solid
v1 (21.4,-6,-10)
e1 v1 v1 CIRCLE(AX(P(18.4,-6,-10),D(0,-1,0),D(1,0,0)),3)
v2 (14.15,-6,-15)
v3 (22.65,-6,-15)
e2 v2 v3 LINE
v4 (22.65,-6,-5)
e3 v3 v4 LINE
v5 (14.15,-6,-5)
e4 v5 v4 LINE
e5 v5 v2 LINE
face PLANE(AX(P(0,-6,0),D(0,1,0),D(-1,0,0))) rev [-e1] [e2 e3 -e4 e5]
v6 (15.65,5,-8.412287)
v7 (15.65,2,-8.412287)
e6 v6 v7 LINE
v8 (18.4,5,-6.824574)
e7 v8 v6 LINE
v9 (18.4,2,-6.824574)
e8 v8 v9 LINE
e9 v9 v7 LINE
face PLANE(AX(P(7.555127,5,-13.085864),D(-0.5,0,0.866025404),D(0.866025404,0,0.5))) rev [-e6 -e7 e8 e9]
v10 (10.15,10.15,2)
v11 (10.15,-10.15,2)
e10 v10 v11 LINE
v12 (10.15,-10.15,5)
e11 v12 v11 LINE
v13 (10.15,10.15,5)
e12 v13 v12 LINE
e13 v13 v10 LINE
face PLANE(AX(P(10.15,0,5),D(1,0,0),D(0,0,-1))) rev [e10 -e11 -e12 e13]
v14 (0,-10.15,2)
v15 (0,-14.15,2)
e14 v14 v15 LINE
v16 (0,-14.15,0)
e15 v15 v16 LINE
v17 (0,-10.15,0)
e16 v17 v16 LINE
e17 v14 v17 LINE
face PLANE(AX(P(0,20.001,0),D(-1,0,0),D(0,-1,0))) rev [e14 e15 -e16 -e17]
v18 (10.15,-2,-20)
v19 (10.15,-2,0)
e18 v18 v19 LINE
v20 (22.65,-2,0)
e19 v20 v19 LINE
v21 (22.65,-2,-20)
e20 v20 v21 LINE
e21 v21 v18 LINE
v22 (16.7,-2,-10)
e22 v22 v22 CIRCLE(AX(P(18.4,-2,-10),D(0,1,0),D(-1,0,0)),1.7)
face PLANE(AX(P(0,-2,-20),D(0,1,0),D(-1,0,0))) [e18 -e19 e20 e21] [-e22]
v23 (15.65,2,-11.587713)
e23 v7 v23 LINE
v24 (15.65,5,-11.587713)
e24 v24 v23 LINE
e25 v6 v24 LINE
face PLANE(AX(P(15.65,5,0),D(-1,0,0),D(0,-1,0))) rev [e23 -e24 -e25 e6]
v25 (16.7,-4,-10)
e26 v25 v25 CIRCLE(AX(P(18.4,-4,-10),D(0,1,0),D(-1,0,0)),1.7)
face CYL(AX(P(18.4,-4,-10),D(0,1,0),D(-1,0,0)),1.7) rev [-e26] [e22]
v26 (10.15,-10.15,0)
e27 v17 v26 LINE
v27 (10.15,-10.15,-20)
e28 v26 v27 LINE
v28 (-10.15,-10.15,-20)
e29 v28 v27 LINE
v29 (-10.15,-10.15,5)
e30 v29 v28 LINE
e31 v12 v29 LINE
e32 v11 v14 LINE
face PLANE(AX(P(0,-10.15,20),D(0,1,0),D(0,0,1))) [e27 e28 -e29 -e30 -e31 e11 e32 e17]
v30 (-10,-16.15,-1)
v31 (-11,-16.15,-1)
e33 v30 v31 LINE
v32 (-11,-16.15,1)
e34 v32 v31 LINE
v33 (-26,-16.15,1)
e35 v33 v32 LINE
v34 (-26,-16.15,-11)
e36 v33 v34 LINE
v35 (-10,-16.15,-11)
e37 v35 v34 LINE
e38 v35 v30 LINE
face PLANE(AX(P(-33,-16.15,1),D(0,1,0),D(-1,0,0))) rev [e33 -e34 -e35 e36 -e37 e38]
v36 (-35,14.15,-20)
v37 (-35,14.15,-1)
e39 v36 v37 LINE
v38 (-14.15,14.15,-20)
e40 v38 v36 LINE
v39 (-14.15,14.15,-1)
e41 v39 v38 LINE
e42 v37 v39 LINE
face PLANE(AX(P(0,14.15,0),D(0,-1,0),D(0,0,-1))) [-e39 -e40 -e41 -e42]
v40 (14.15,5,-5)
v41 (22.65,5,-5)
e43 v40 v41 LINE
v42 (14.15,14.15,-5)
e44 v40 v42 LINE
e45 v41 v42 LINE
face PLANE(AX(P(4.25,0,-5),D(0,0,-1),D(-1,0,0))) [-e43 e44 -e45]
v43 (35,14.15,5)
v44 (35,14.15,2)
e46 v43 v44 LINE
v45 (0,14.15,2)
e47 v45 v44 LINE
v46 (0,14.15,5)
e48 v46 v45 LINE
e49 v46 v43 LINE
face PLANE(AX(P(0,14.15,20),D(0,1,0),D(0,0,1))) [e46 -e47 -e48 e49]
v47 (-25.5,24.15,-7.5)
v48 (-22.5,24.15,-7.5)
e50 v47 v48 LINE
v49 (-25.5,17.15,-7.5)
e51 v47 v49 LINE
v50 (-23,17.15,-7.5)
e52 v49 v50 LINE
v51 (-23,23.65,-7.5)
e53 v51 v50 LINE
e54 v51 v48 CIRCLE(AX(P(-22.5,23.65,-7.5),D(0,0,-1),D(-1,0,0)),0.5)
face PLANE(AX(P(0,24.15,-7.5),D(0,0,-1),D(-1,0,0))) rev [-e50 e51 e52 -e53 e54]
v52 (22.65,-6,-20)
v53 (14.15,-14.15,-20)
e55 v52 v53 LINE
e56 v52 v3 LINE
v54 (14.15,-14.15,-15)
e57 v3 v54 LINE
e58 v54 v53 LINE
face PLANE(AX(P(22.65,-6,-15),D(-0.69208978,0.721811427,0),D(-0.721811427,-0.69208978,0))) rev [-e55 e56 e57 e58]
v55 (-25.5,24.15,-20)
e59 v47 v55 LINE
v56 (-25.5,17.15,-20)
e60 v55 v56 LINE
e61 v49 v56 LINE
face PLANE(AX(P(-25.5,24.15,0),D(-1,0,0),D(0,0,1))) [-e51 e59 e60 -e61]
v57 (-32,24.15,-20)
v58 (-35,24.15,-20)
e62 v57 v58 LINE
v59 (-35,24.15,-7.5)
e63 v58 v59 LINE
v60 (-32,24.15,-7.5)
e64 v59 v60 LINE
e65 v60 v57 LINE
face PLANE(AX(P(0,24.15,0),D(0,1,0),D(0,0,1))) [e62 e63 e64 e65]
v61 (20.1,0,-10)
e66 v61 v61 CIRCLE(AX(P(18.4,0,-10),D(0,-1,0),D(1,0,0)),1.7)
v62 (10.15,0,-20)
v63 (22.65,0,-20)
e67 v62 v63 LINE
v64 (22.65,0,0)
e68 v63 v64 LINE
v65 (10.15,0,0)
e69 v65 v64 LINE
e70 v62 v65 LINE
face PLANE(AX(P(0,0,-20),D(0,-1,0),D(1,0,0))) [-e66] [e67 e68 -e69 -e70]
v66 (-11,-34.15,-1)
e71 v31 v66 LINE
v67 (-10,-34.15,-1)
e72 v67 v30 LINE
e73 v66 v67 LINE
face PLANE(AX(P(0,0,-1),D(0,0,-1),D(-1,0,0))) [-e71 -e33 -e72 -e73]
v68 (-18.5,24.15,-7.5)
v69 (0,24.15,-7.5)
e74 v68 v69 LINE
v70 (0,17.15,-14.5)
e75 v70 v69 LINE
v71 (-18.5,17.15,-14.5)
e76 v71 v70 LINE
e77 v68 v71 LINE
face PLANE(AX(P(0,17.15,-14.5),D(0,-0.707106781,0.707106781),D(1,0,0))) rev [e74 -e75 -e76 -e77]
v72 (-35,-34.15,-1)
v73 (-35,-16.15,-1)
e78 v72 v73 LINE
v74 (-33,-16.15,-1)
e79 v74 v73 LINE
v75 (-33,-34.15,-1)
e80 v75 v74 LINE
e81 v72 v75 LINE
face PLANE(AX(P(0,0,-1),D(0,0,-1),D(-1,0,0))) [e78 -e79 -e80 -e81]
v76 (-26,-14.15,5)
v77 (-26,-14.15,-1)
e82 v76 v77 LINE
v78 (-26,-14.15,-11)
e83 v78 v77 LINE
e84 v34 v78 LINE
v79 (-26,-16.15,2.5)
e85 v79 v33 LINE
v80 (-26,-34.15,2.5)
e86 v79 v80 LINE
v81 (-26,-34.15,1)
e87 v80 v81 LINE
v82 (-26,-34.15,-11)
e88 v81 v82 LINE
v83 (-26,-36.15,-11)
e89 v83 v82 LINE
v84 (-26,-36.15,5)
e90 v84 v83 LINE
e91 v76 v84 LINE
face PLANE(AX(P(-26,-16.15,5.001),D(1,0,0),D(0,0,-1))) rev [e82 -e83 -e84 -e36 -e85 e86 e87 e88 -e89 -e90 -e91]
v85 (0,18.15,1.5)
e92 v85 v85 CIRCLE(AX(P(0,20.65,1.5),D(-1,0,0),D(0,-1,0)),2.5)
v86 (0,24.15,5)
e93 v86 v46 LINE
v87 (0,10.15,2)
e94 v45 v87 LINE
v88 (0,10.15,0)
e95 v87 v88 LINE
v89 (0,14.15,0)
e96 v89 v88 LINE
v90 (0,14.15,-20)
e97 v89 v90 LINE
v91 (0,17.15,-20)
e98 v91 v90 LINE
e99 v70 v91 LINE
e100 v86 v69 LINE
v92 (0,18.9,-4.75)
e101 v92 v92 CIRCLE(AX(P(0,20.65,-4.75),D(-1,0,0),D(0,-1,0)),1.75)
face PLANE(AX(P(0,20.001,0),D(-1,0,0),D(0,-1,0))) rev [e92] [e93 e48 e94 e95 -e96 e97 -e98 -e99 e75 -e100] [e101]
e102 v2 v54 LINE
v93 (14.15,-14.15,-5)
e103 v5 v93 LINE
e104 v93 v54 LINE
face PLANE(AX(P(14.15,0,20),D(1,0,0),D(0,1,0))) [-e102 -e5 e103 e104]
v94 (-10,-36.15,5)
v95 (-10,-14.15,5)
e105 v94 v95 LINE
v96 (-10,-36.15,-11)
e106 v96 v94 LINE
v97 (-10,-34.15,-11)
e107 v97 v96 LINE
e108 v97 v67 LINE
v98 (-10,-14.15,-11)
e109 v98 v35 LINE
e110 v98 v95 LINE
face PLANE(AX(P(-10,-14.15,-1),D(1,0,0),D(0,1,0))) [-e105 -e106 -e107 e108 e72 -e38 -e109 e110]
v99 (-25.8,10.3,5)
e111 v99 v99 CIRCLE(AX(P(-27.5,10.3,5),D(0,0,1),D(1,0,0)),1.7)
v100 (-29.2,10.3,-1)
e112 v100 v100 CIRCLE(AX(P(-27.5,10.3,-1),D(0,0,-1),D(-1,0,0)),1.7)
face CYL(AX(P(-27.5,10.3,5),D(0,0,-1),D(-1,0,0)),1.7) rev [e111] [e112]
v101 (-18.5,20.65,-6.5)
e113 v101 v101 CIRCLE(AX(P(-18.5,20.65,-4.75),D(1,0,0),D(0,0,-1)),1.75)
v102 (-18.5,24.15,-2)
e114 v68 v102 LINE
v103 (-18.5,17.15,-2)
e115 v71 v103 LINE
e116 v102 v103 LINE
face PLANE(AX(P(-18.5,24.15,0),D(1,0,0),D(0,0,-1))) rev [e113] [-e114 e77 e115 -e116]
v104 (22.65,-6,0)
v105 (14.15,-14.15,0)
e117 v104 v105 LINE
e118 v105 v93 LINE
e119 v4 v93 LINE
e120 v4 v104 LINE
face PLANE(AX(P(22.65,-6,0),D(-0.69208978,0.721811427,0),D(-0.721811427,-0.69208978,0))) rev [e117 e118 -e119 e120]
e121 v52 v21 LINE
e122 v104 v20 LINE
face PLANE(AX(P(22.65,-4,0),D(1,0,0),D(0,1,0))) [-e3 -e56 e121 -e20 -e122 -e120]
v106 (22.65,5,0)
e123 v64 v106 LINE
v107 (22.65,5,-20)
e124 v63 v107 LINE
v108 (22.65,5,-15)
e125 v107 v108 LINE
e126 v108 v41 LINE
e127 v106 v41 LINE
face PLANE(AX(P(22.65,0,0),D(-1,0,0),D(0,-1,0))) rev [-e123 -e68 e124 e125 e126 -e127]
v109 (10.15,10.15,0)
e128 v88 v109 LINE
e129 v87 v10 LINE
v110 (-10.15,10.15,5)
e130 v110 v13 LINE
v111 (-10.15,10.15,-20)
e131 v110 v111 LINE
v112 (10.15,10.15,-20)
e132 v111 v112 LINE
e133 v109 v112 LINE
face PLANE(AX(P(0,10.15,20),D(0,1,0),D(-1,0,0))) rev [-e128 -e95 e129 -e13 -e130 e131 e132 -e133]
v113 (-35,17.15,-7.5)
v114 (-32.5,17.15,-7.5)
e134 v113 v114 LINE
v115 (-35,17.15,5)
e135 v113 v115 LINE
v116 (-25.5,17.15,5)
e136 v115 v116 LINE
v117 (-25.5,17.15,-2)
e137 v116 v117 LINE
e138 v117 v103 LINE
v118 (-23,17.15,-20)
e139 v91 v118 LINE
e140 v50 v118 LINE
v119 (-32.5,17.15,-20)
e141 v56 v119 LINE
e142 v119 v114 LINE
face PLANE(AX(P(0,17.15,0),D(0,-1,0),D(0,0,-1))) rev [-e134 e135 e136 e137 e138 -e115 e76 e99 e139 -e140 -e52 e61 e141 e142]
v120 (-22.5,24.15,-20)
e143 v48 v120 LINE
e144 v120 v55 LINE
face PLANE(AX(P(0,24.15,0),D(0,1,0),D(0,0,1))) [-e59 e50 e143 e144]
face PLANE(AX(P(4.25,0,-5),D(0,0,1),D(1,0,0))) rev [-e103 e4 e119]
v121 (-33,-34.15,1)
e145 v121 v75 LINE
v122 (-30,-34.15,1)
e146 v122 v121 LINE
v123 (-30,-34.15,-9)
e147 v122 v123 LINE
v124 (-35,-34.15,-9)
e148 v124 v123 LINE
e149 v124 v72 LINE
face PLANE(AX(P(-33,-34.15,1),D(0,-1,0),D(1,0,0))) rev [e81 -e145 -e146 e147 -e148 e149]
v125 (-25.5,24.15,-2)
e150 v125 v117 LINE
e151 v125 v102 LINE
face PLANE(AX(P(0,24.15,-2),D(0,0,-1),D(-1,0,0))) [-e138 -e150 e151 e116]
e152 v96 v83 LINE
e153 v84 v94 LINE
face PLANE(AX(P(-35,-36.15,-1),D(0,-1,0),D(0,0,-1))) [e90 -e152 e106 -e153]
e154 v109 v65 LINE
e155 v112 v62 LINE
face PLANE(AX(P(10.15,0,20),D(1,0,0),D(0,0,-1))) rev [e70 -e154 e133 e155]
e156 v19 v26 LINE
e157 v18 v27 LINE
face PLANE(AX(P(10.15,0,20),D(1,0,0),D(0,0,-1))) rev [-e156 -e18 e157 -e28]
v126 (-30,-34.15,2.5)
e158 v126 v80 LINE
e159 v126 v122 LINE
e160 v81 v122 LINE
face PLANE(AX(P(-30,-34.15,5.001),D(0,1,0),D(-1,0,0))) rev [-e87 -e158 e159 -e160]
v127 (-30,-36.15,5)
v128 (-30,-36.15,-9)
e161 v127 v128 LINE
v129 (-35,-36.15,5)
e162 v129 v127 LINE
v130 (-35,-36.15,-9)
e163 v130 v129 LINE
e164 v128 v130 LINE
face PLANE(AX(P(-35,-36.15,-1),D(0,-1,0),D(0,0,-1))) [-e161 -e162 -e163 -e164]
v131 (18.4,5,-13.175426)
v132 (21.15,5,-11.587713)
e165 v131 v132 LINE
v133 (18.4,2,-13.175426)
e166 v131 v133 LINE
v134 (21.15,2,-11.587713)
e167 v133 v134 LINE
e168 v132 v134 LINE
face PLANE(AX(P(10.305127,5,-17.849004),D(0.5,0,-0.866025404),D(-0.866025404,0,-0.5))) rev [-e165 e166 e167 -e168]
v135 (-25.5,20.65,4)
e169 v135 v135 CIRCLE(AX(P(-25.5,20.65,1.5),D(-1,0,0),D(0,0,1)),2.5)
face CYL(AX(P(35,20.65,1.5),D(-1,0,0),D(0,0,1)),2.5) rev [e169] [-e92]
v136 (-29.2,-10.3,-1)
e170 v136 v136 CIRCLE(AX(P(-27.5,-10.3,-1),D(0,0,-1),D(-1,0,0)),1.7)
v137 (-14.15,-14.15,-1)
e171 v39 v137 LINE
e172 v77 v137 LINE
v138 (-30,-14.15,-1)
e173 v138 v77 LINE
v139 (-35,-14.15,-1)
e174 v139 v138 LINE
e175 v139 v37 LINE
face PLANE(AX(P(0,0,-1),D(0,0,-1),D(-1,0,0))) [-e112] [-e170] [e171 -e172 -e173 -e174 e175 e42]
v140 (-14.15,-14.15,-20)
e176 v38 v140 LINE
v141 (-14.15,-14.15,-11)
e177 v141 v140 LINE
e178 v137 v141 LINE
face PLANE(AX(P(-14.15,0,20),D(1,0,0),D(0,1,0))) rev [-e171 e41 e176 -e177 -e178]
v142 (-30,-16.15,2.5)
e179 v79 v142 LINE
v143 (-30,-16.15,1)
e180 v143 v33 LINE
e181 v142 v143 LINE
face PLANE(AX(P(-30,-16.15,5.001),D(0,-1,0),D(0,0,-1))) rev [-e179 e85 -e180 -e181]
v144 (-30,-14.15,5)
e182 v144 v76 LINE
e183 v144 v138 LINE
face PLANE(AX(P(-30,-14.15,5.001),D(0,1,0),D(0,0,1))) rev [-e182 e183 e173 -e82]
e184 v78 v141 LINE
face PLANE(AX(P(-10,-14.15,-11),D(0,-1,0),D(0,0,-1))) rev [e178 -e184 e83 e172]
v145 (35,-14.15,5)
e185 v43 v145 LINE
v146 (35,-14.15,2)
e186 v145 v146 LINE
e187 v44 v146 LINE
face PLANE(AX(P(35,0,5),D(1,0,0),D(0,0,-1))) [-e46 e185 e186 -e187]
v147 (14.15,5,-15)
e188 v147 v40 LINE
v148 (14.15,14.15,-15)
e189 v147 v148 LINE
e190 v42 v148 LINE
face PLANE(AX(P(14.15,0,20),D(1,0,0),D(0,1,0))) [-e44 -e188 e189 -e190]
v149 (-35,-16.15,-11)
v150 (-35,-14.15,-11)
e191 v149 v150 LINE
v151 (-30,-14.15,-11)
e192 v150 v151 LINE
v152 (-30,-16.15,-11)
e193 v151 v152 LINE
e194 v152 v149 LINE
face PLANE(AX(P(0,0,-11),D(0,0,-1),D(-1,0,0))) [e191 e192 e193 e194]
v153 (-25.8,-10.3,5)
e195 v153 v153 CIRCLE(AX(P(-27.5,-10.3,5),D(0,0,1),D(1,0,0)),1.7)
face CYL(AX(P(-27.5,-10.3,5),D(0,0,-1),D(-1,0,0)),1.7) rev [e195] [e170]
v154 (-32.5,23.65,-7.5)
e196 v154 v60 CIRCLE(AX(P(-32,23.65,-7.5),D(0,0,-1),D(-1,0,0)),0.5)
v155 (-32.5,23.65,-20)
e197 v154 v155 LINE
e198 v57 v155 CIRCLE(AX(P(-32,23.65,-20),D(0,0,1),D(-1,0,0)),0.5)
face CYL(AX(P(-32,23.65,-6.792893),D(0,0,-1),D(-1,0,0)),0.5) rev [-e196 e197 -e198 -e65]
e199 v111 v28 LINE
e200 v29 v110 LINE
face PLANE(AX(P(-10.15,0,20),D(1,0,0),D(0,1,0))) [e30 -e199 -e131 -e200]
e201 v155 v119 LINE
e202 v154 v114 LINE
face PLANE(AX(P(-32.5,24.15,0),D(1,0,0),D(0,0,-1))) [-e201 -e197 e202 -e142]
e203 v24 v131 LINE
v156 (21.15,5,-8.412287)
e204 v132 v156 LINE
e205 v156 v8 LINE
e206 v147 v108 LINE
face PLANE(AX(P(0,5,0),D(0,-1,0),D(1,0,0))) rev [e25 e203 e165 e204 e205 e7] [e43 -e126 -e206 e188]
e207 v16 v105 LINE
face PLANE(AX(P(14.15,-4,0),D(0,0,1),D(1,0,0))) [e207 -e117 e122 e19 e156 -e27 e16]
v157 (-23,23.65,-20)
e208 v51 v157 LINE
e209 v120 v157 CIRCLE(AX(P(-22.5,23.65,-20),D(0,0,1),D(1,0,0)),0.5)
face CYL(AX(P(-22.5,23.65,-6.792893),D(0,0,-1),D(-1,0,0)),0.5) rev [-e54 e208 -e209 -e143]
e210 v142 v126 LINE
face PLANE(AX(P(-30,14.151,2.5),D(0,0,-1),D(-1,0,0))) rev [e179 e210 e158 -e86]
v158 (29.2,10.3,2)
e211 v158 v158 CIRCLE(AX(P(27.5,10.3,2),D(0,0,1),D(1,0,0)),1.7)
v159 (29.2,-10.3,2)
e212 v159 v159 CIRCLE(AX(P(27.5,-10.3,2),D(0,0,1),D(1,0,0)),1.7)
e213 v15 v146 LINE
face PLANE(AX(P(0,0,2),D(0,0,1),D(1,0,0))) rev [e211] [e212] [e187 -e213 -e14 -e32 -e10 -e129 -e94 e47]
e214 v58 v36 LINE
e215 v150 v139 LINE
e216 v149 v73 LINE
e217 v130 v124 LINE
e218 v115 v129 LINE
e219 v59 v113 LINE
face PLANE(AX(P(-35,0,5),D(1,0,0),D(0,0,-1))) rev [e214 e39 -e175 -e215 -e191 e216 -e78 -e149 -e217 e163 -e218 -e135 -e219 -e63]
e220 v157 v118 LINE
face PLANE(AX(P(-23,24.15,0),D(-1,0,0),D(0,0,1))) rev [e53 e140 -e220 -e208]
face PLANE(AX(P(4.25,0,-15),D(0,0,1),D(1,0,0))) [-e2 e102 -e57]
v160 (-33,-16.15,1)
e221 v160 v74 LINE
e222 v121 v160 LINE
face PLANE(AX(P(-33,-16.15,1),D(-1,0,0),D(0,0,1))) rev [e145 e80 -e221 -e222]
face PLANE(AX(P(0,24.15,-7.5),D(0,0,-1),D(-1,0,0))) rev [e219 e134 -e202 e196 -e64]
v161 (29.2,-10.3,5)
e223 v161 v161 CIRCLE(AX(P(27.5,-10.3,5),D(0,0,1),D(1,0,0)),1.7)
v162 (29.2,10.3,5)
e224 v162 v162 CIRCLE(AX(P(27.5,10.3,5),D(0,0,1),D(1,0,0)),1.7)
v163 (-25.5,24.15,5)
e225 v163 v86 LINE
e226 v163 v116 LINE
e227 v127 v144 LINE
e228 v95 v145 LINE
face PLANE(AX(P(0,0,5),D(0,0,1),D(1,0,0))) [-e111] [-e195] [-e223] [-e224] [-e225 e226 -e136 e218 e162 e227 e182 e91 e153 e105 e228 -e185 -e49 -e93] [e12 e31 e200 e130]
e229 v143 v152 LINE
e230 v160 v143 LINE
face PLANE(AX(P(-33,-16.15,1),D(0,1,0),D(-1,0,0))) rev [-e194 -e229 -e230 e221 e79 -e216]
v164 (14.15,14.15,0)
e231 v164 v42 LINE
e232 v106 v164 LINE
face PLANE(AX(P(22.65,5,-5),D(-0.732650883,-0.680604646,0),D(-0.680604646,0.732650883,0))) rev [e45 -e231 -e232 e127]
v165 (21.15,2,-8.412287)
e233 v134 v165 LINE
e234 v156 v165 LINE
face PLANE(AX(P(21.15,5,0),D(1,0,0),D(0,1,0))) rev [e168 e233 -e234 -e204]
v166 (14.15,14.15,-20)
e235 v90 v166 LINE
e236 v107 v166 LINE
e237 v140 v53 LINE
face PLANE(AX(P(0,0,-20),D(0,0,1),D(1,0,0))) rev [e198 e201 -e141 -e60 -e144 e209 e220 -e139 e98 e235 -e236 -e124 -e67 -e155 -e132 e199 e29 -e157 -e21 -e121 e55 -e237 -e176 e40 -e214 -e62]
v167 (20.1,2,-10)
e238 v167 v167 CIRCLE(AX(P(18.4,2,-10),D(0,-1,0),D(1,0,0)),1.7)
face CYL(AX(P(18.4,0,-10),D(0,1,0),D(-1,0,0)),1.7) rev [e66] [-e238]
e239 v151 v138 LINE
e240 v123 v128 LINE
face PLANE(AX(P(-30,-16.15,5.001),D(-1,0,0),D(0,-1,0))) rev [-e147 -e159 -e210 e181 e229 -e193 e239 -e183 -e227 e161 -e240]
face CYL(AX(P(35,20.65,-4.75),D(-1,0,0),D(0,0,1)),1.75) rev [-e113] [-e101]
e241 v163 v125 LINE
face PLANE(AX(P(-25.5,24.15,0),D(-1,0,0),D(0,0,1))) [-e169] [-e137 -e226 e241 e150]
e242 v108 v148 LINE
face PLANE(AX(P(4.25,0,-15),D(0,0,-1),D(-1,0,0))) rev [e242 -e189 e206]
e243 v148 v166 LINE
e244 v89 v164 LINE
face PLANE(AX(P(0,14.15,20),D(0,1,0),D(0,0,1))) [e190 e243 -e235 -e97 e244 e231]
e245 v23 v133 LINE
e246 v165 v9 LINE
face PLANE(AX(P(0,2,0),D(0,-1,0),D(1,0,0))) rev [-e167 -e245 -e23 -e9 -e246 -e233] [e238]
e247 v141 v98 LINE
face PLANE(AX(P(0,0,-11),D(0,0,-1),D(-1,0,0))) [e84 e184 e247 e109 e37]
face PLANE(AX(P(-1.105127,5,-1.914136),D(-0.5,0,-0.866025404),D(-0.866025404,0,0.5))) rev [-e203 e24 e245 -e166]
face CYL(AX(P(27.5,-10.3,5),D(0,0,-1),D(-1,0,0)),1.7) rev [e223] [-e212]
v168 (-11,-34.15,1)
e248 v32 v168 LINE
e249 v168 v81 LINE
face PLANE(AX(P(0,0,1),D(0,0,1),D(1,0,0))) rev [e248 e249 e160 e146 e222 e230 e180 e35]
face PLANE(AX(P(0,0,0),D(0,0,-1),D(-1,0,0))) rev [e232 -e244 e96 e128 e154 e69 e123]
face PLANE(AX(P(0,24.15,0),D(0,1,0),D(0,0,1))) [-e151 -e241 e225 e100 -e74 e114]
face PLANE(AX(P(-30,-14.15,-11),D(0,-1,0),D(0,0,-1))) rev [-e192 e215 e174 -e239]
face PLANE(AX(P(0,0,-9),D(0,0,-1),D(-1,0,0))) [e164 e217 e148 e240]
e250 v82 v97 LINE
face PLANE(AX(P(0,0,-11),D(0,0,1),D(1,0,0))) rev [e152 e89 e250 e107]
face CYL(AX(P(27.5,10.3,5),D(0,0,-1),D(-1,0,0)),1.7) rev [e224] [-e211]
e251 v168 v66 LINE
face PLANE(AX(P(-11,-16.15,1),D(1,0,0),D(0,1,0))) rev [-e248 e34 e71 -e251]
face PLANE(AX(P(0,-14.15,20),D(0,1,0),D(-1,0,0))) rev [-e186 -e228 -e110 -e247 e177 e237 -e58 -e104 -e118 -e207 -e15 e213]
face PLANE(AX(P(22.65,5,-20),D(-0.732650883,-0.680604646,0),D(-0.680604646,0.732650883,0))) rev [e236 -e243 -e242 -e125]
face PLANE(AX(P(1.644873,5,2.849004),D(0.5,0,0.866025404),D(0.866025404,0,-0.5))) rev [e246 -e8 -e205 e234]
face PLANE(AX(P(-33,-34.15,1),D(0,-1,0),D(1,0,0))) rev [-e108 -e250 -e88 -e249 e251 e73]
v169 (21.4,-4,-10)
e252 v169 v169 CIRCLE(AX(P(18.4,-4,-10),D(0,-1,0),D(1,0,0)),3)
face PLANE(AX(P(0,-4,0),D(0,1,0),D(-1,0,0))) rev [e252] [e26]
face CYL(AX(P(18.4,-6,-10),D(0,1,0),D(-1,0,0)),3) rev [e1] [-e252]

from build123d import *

# Parameters (mm, degrees)
ESQUISSE1_W                = 28.3
ESQUISSE1_H                = 28.3
ESQUISSE1_W_2              = 20.3
ESQUISSE1_H_2              = 20.3
BOSS_EXTRU_1_DEPTH         = 20
BOSS_EXTRU_7_DEPTH         = 20
ESQUISSE2_W                = 8.5
ESQUISSE2_H                = 20
ESQUISSE2_R                = 1.7
BOSS_EXTRU_2_DEPTH         = 2
ESQUISSE2_3_W              = 8.5
ESQUISSE2_3_H              = 20
BOSS_EXTRU_3_DEPTH         = 3
ESQUISSE3_W                = 8.5
ESQUISSE3_H                = 20
ESQUISSE3_R                = 1.7
BOSS_EXTRU_4_DEPTH         = 2
ESQUISSE5_W                = 8.5
ESQUISSE5_H                = 20
ESQUISSE5_R                = 3
BOSS_EXTRU_5_DEPTH         = 2
BOSS_EXTRU_6_DEPTH         = 20
BOSS_EXTRU_6_DEPTH_BACK    = 20
ESQUISSE6_W                = 28.3
ESQUISSE6_H                = 28.3
ESQUISSE6_W_2              = 15.3
ESQUISSE6_H_2              = 15.3
ENL_V_MAT_EXTRU_1_REACH    = 68.678
ESQUISSE7_W                = 6.5
ESQUISSE7_H                = 2
ENL_V_MAT_EXTRU_2_REACH    = 65.341
ESQUISSE8_W                = 14.15
ESQUISSE8_H                = 2
ESQUISSE9_W                = 8.5
ESQUISSE9_H                = 40
BOSS_EXTRU_8_DEPTH         = 5
ESQUISSE9_4_R              = 1.7
BOSS_EXTRU_9_DEPTH         = 2
BOSS_EXTRU_10_START        = -2
ESQUISSE10_W               = 8.5
ESQUISSE10_H               = 40
ESQUISSE10_R               = 1.7
BOSS_EXTRU_10_DEPTH        = 2
ESQUISSE11_W               = 8.5
ESQUISSE11_H               = 40
ESQUISSE11_R               = 3
BOSS_EXTRU_11_DEPTH        = 2
NERVURE4_REACH             = 68.678
ESQUISSE14_WALL_W          = 147.131281186
ESQUISSE14_WALL_H          = 5
NERVURE10_REACH            = 68.678
ESQUISSE16_WALL_W          = 147.844247416
ESQUISSE16_WALL_H          = 5
R_P_TITION_LIN_AIRE1_COUNT = 3
R_P_TITION_LIN_AIRE1_PITCH = 17.5
NERVURE11_REACH            = 76.685
ESQUISSE17_WALL_W          = 163.85974229
ESQUISSE17_WALL_H          = 5
NERVURE17_REACH            = 58.973
ESQUISSE19_WALL_W          = 127.721749296
ESQUISSE19_WALL_H          = 5
R_P_TITION_LIN_AIRE2_COUNT = 2
R_P_TITION_LIN_AIRE2_PITCH = 15
R_P_TITION_LIN_AIRE3_COUNT = 2
R_P_TITION_LIN_AIRE3_PITCH = 15
ENL_V_MAT_EXTRU_3_REACH    = 57.288
ESQUISSE20_W               = 77.833771897
ESQUISSE20_H               = 63.25162408
ESQUISSE21_W               = 14.15
ESQUISSE21_H               = 3.85
BOSS_EXTRU_12_DEPTH        = 3
BOSS_EXTRU_13_START        = 3
ESQUISSE23_W               = 20.85
ESQUISSE23_H               = 28.3
ESQUISSE23_R               = 1.7
BOSS_EXTRU_13_DEPTH        = 3
ESQUISSE24_W               = 25
ESQUISSE24_H               = 22
BOSS_EXTRU_14_DEPTH        = 6
ESQUISSE25_W               = 22
ESQUISSE25_H               = 18
ENL_V_MAT_EXTRU_4_DEPTH    = 2
ENL_V_MAT_EXTRU_5_REACH    = 55.785
ESQUISSE26_W               = 4
ESQUISSE26_H               = 2
ENL_V_MAT_EXTRU_6_REACH    = 64.912
ESQUISSE27_W               = 4
ESQUISSE27_H               = 2.5
ESQUISSE28_W               = 16
ESQUISSE28_H               = 2
ESQUISSE28_W_2             = 5
BOSS_EXTRU_15_DEPTH        = 10
ESQUISSE29_W               = 5
ESQUISSE29_H               = 2
ENL_V_MAT_EXTRU_7_DEPTH    = 2
ESQUISSE30_W               = 35
ESQUISSE30_H               = 25
BOSS_EXTRU_16_DEPTH        = 3
ESQUISSE31_W               = 2.5
ESQUISSE31_H               = 12.5
ESQUISSE31_W_2             = 18.5
ESQUISSE31_H_2             = 5.5
BOSS_EXTRU_17_DEPTH        = 7
ESQUISSE32_R               = 1.75
ESQUISSE32_R_2             = 2.5
ENL_V_MAT_EXTRU_8_DEPTH    = 74.260306442
CHANFREIN1_SIZE            = 7
BOSS_EXTRU_18_DEPTH        = 12.5


with BuildPart() as part:
    # Esquisse1 → Boss.-Extru.1 (new body)
    with BuildSketch(Plane.XY):
        Rectangle(ESQUISSE1_W, ESQUISSE1_H)
        Rectangle(ESQUISSE1_W_2, ESQUISSE1_H_2, mode=Mode.SUBTRACT)
    extrude(amount=BOSS_EXTRU_1_DEPTH)

    # Esquisse1<3> → Boss.-Extru.7 (add)
    with BuildSketch(Plane.XY):
        Polygon((14.15, 14.15), (-14.15, 14.15), (-14.15, -14.15), (14.15, -14.15), (14.15, -2), (10.15, -2), (10.15, -10.15), (-10.15, -10.15), (-10.15, 10.15), (10.15, 10.15), (10.15, 0), (14.15, 0), align=None)
    extrude(amount=-BOSS_EXTRU_7_DEPTH)

    # Esquisse2 → Boss.-Extru.2 (add)
    with BuildSketch(Plane(origin=(0, 2, 0), x_dir=(-1, 0, 0), z_dir=(0, -1, 0))):
        with Locations((-18.4, 10)):
            Rectangle(ESQUISSE2_W, ESQUISSE2_H)
        with Locations(Location((-18.4, 10, 0), (0, 0, 180))):
            Circle(ESQUISSE2_R, mode=Mode.SUBTRACT)
    extrude(amount=BOSS_EXTRU_2_DEPTH)

    # Esquisse2<3> → Boss.-Extru.3 (add)
    with BuildSketch(Plane(origin=(0, 2, 0), x_dir=(-1, 0, 0), z_dir=(0, -1, 0))):
        with Locations((-18.4, 10)):
            Rectangle(ESQUISSE2_3_W, ESQUISSE2_3_H)
        Polygon((-15.65, 11.58771324), (-15.65, 8.41228676), (-18.4, 6.824573519), (-21.15, 8.41228676), (-21.15, 11.58771324), (-18.4, 13.175426481), align=None, mode=Mode.SUBTRACT)
    extrude(amount=-BOSS_EXTRU_3_DEPTH)

    # Esquisse3 → Boss.-Extru.4 (add)
    with BuildSketch(Plane(origin=(0, -2, 0), x_dir=(1, 0, 0), z_dir=(0, 1, 0))):
        with Locations((18.4, 10)):
            Rectangle(ESQUISSE3_W, ESQUISSE3_H)
        with Locations((18.4, 10)):
            Circle(ESQUISSE3_R, mode=Mode.SUBTRACT)
    extrude(amount=-BOSS_EXTRU_4_DEPTH)

    # Esquisse5 → Boss.-Extru.5 (add)
    with BuildSketch(Plane.XZ.offset(4)):
        with Locations((18.4, -10)):
            Rectangle(ESQUISSE5_W, ESQUISSE5_H)
        with Locations((18.4, -10)):
            Circle(ESQUISSE5_R, mode=Mode.SUBTRACT)
    extrude(amount=BOSS_EXTRU_5_DEPTH)

    # Esquisse6 → Boss.-Extru.6 (add, two sides: drawn at the far end of the back side and taken through both)
    with BuildSketch(Plane(origin=(0, 0, 0), x_dir=(-1, 0, 0), z_dir=(0, -1, 0)).offset(-BOSS_EXTRU_6_DEPTH_BACK)):
        with Locations((0, -34.15)):
            Rectangle(ESQUISSE6_W, ESQUISSE6_H)
        with Locations((0, -34.15)):
            Rectangle(ESQUISSE6_W_2, ESQUISSE6_H_2, mode=Mode.SUBTRACT)
    extrude(amount=BOSS_EXTRU_6_DEPTH + BOSS_EXTRU_6_DEPTH_BACK)

    # Esquisse7 → Enlèv. mat.-Extru.1 (cut, up to next)
    with BuildSketch(Plane.XZ.offset(20), mode=Mode.PRIVATE) as enl_v_mat_extru_1_sk1:
        with Locations((10.9, 35.15)):
            Rectangle(ESQUISSE7_W, ESQUISSE7_H)
    enl_v_mat_extru_1_tool1 = extrude(enl_v_mat_extru_1_sk1.sketch, amount=-ENL_V_MAT_EXTRU_1_REACH, mode=Mode.PRIVATE) & part.part
    add(enl_v_mat_extru_1_tool1.solids().sort_by_distance((10.9, -20, 35.15))[0], mode=Mode.SUBTRACT)

    # Esquisse8 → Enlèv. mat.-Extru.2 (cut, up to next)
    with BuildSketch(Plane.XZ.offset(14.15), mode=Mode.PRIVATE) as enl_v_mat_extru_2_sk1:
        with Locations((7.075, 1)):
            Rectangle(ESQUISSE8_W, ESQUISSE8_H)
    enl_v_mat_extru_2_tool1 = extrude(enl_v_mat_extru_2_sk1.sketch, amount=-ENL_V_MAT_EXTRU_2_REACH, mode=Mode.PRIVATE) & part.part
    add(enl_v_mat_extru_2_tool1.solids().sort_by_distance((7.075, -14.15, 1))[0], mode=Mode.SUBTRACT)

    # Esquisse9 → Boss.-Extru.8 (add)
    with BuildSketch(Plane.XY.offset(34.15)):
        with Locations((18.4, 0)):
            Rectangle(ESQUISSE9_W, ESQUISSE9_H)
        Polygon((18.4, 6.824573519), (21.15, 8.41228676), (21.15, 11.58771324), (18.4, 13.175426481), (15.65, 11.58771324), (15.65, 8.41228676), align=None, mode=Mode.SUBTRACT)
        Polygon((18.4, -6.824573519), (21.15, -8.41228676), (21.15, -11.58771324), (18.4, -13.175426481), (15.65, -11.58771324), (15.65, -8.41228676), align=None, mode=Mode.SUBTRACT)
    extrude(amount=-BOSS_EXTRU_8_DEPTH)

    # Esquisse9<4> → Boss.-Extru.9 (add)
    # profile 1 of 2: a face of its own
    with BuildSketch(Plane.XY.offset(34.15)):
        Polygon((15.65, 8.41228676), (18.4, 6.824573519), (21.15, 8.41228676), (21.15, 11.58771324), (18.4, 13.175426481), (15.65, 11.58771324), align=None)
        with Locations((18.4, 10)):
            Circle(ESQUISSE9_4_R, mode=Mode.SUBTRACT)
    # profile 2 of 2: a face of its own
    with BuildSketch(Plane.XY.offset(34.15)):
        Polygon((21.15, -8.41228676), (21.15, -11.58771324), (18.4, -13.175426481), (15.65, -11.58771324), (15.65, -8.41228676), (18.4, -6.824573519), align=None)
        with Locations((18.4, -10)):
            Circle(ESQUISSE9_4_R, mode=Mode.SUBTRACT)
    extrude(amount=-BOSS_EXTRU_9_DEPTH)

    # Esquisse10 → Boss.-Extru.10 (add)
    with BuildSketch(Plane(origin=(0, 0, 36.15), x_dir=(-1, 0, 0), z_dir=(0, 0, -1)).offset(BOSS_EXTRU_10_START)):
        with Locations((-18.4, 0)):
            Rectangle(ESQUISSE10_W, ESQUISSE10_H)
        with Locations(Location((-18.4, -10, 0), (0, 0, 180))):
            Circle(ESQUISSE10_R, mode=Mode.SUBTRACT)
        with Locations(Location((-18.4, 10, 0), (0, 0, 180))):
            Circle(ESQUISSE10_R, mode=Mode.SUBTRACT)
    extrude(amount=BOSS_EXTRU_10_DEPTH)

    # Esquisse11 → Boss.-Extru.11 (add)
    with BuildSketch(Plane.XY.offset(38.15)):
        with Locations((18.4, 0)):
            Rectangle(ESQUISSE11_W, ESQUISSE11_H)
        with Locations((18.4, 10)):
            Circle(ESQUISSE11_R, mode=Mode.SUBTRACT)
        with Locations((18.4, -10)):
            Circle(ESQUISSE11_R, mode=Mode.SUBTRACT)
    extrude(amount=BOSS_EXTRU_11_DEPTH)

    # Esquisse14 wall → Nervure4 (add, up to next)
    with BuildSketch(Plane(origin=(18.4, -20, 44.225), x_dir=(0.721811427095, 0, -0.692089780097), z_dir=(0.692089780097, 0, 0.721811427095)), mode=Mode.PRIVATE) as nervure4_sk1:
        with Locations((0, 2.5)):
            Rectangle(ESQUISSE14_WALL_W, ESQUISSE14_WALL_H)
    nervure4_tool1 = extrude(nervure4_sk1.sketch, amount=-NERVURE4_REACH, mode=Mode.PRIVATE) - part.part
    nervure4 = nervure4_tool1.solids().sort_by_distance((18.4, -20, 44.225))[0]
    add(nervure4)

    # Esquisse16 wall → Nervure10 (add, up to next)
    with BuildSketch(Plane(origin=(18.4, -20, 24.575), x_dir=(-0.680604645507, 0, -0.732650883105), z_dir=(0.732650883105, 0, -0.680604645507)), mode=Mode.PRIVATE) as nervure10_sk1:
        with Locations((0, 2.5)):
            Rectangle(ESQUISSE16_WALL_W, ESQUISSE16_WALL_H)
    nervure10_tool1 = extrude(nervure10_sk1.sketch, amount=-NERVURE10_REACH, mode=Mode.PRIVATE) - part.part
    nervure10 = nervure10_tool1.solids().sort_by_distance((18.4, -20, 24.575))[0]
    add(nervure10)

    # Répétition linéaire1: Nervure4, Nervure10 ×3
    with Locations(*[(0, i * R_P_TITION_LIN_AIRE1_PITCH, 0) for i in range(1, R_P_TITION_LIN_AIRE1_COUNT)]):
        add(nervure4)
        add(nervure10)

    # Esquisse17 wall → Nervure11 (add, up to next)
    with BuildSketch(Plane(origin=(18.4, 9.575, -20), x_dir=(-0.680604645507, 0.732650883105, 0), z_dir=(0.732650883105, 0.680604645507, 0)), mode=Mode.PRIVATE) as nervure11_sk1:
        with Locations((0, 2.5)):
            Rectangle(ESQUISSE17_WALL_W, ESQUISSE17_WALL_H)
    nervure11_tool1 = extrude(nervure11_sk1.sketch, amount=-NERVURE11_REACH, mode=Mode.PRIVATE) - part.part
    nervure11 = nervure11_tool1.solids().sort_by_distance((18.4, 9.575, -20))[0]
    add(nervure11)

    # Esquisse19 wall → Nervure17 (add, up to next)
    with BuildSketch(Plane(origin=(18.4, -10.075, 0), x_dir=(-0.721811427095, -0.692089780097, 0), z_dir=(0.692089780097, -0.721811427095, 0)), mode=Mode.PRIVATE) as nervure17_sk1:
        with Locations((0, 2.5)):
            Rectangle(ESQUISSE19_WALL_W, ESQUISSE19_WALL_H)
    nervure17_tool1 = extrude(nervure17_sk1.sketch, amount=-NERVURE17_REACH, mode=Mode.PRIVATE) - part.part
    nervure17 = nervure17_tool1.solids().sort_by_distance((18.4, -10.075, 0))[0]
    add(nervure17)

    # Répétition linéaire2: Nervure17 ×2
    with Locations(*[(0, 0, -i * R_P_TITION_LIN_AIRE2_PITCH) for i in range(1, R_P_TITION_LIN_AIRE2_COUNT)]):
        add(nervure17)

    # Répétition linéaire3: Nervure11 ×2
    with Locations(*[(0, 0, i * R_P_TITION_LIN_AIRE3_PITCH) for i in range(1, R_P_TITION_LIN_AIRE3_COUNT)]):
        add(nervure11)

    # Esquisse20 → Enlèv. mat.-Extru.3 (cut, up to next)
    with BuildSketch(Plane(origin=(0, 0, 2), x_dir=(-1, 0, 0), z_dir=(0, 0, -1)), mode=Mode.PRIVATE) as enl_v_mat_extru_3_sk1:
        with Locations((6.593135557, -7.228757038)):
            Rectangle(ESQUISSE20_W, ESQUISSE20_H)
    enl_v_mat_extru_3_tool1 = extrude(enl_v_mat_extru_3_sk1.sketch, amount=-ENL_V_MAT_EXTRU_3_REACH, mode=Mode.PRIVATE) & part.part
    add(enl_v_mat_extru_3_tool1.solids().sort_by_distance((-6.593136, -7.228757, 2))[0], mode=Mode.SUBTRACT)

    # Esquisse21 → Boss.-Extru.12 (add)
    with BuildSketch(Plane.XY.offset(2)):
        with BuildLine():
            ThreePointArc((-27.5, 8.6), (-28.702081528, 11.502081528), (-25.8, 10.3))
            Line((-25.8, 10.3), (-14.15, 10.3))
            Line((-14.15, 10.3), (-14.15, 14.15))
            Line((-14.15, 14.15), (-35, 14.15))
            Line((-35, 14.15), (-35, -14.15))
            Line((-35, -14.15), (-14.15, -14.15))
            Line((-14.15, -14.15), (-14.15, -10.3))
            Line((-14.15, -10.3), (-25.8, -10.3))
            ThreePointArc((-25.8, -10.3), (-28.702081528, -11.502081528), (-27.5, -8.6))
            Line((-27.5, -8.6), (-27.5, 8.6))
        make_face()
        with BuildLine():
            Line((-14.15, 10.3), (-25.8, 10.3))
            ThreePointArc((-25.8, 10.3), (-26.297918472, 9.097918472), (-27.5, 8.6))
            Line((-27.5, 8.6), (-27.5, -8.6))
            ThreePointArc((-27.5, -8.6), (-26.297918472, -9.097918472), (-25.8, -10.3))
            Line((-25.8, -10.3), (-14.15, -10.3))
            Line((-14.15, -10.3), (-14.15, 10.3))
        make_face()
        with BuildLine():
            Line((0, 14.15), (0, 10.3))
            Line((0, 10.3), (25.8, 10.3))
            ThreePointArc((25.8, 10.3), (27.5, 12), (29.2, 10.3))
            ThreePointArc((29.2, 10.3), (28.702081528, 9.097918472), (27.5, 8.6))
            Line((27.5, 8.6), (27.5, -8.6))
            ThreePointArc((27.5, -8.6), (28.702081528, -9.097918472), (29.2, -10.3))
            ThreePointArc((29.2, -10.3), (27.5, -12), (25.8, -10.3))
            Line((25.8, -10.3), (0, -10.3))
            Line((0, -10.3), (0, -14.15))
            Line((0, -14.15), (35, -14.15))
            Line((35, -14.15), (35, 14.15))
            Line((35, 14.15), (0, 14.15))
        make_face()
        with Locations((-7.075, 12.225)):
            Rectangle(ESQUISSE21_W, ESQUISSE21_H)
        Polygon((0, 10.3), (-14.15, 10.3), (-14.15, -10.3), (0, -10.3), (0, -10.15), (-10.15, -10.15), (-10.15, 10.15), (0, 10.15), align=None)
        with Locations((-7.075, -12.225)):
            Rectangle(ESQUISSE21_W, ESQUISSE21_H)
        with BuildLine():
            Line((25.8, 10.3), (0, 10.3))
            Line((0, 10.3), (0, 10.15))
            Line((0, 10.15), (10.15, 10.15))
            Line((10.15, 10.15), (10.15, -10.15))
            Line((10.15, -10.15), (0, -10.15))
            Line((0, -10.15), (0, -10.3))
            Line((0, -10.3), (25.8, -10.3))
            ThreePointArc((25.8, -10.3), (26.297918472, -9.097918472), (27.5, -8.6))
            Line((27.5, -8.6), (27.5, 8.6))
            ThreePointArc((27.5, 8.6), (26.297918472, 9.097918472), (25.8, 10.3))
        make_face()
    extrude(amount=BOSS_EXTRU_12_DEPTH)

    # Esquisse23 → Boss.-Extru.13 (add)
    with BuildSketch(Plane(origin=(0, 0, 2), x_dir=(-1, 0, 0), z_dir=(0, 0, -1)).offset(BOSS_EXTRU_13_START)):
        with Locations((24.575, 0)):
            Rectangle(ESQUISSE23_W, ESQUISSE23_H)
        with Locations((27.5, 10.3)):
            Circle(ESQUISSE23_R, mode=Mode.SUBTRACT)
        with Locations((27.5, -10.3)):
            Circle(ESQUISSE23_R, mode=Mode.SUBTRACT)
    extrude(amount=-BOSS_EXTRU_13_DEPTH)

    # Esquisse24 → Boss.-Extru.14 (add)
    with BuildSketch(Plane.XY.offset(5)):
        with Locations((-22.5, -25.15)):
            Rectangle(ESQUISSE24_W, ESQUISSE24_H)
    extrude(amount=-BOSS_EXTRU_14_DEPTH)

    # Esquisse25 → Enlèv. mat.-Extru.4 (cut)
    with BuildSketch(Plane(origin=(0, 0, -1), x_dir=(-1, 0, 0), z_dir=(0, 0, -1))):
        with Locations((22, -25.15)):
            Rectangle(ESQUISSE25_W, ESQUISSE25_H)
    extrude(amount=-ENL_V_MAT_EXTRU_4_DEPTH, mode=Mode.SUBTRACT)

    # Esquisse26 → Enlèv. mat.-Extru.5 (cut, up to next)
    with BuildSketch(Plane(origin=(0, 0, -1), x_dir=(-1, 0, 0), z_dir=(0, 0, -1)), mode=Mode.PRIVATE) as enl_v_mat_extru_5_sk1:
        with Locations((28, -15.15)):
            Rectangle(ESQUISSE26_W, ESQUISSE26_H)
    enl_v_mat_extru_5_tool1 = extrude(enl_v_mat_extru_5_sk1.sketch, amount=-ENL_V_MAT_EXTRU_5_REACH, mode=Mode.PRIVATE) & part.part
    # Esquisse26 → Enlèv. mat.-Extru.5 (cut, up to next)
    with BuildSketch(Plane(origin=(0, 0, -1), x_dir=(-1, 0, 0), z_dir=(0, 0, -1)), mode=Mode.PRIVATE) as enl_v_mat_extru_5_sk2:
        with Locations((28, -35.15)):
            Rectangle(ESQUISSE26_W, ESQUISSE26_H)
    enl_v_mat_extru_5_tool2 = extrude(enl_v_mat_extru_5_sk2.sketch, amount=-ENL_V_MAT_EXTRU_5_REACH, mode=Mode.PRIVATE) & part.part
    add(enl_v_mat_extru_5_tool1.solids().sort_by_distance((-28, -15.15, -1))[0], mode=Mode.SUBTRACT)
    add(enl_v_mat_extru_5_tool2.solids().sort_by_distance((-28, -35.15, -1))[0], mode=Mode.SUBTRACT)

    # Esquisse27 → Enlèv. mat.-Extru.6 (cut, up to next)
    with BuildSketch(Plane.XZ.offset(34.15), mode=Mode.PRIVATE) as enl_v_mat_extru_6_sk1:
        with Locations((-28, 3.75)):
            Rectangle(ESQUISSE27_W, ESQUISSE27_H)
    enl_v_mat_extru_6_tool1 = extrude(enl_v_mat_extru_6_sk1.sketch, amount=-ENL_V_MAT_EXTRU_6_REACH, mode=Mode.PRIVATE) & part.part
    add(enl_v_mat_extru_6_tool1.solids().sort_by_distance((-28, -34.15, 3.75))[0], mode=Mode.SUBTRACT)

    # Esquisse28 → Boss.-Extru.15 (add)
    with BuildSketch(Plane(origin=(0, 0, -1), x_dir=(-1, 0, 0), z_dir=(0, 0, -1))):
        with Locations((18, -15.15)):
            Rectangle(ESQUISSE28_W, ESQUISSE28_H)
        with Locations((32.5, -15.15)):
            Rectangle(ESQUISSE28_W_2, ESQUISSE28_H)
        with Locations((32.5, -35.15)):
            Rectangle(ESQUISSE28_W_2, ESQUISSE28_H)
        with Locations((18, -35.15)):
            Rectangle(ESQUISSE28_W, ESQUISSE28_H)
    extrude(amount=BOSS_EXTRU_15_DEPTH)

    # Esquisse29 → Enlèv. mat.-Extru.7 (cut)
    with BuildSketch(Plane(origin=(0, 0, -11), x_dir=(-1, 0, 0), z_dir=(0, 0, -1))):
        with Locations((32.5, -35.15)):
            Rectangle(ESQUISSE29_W, ESQUISSE29_H)
    extrude(amount=-ENL_V_MAT_EXTRU_7_DEPTH, mode=Mode.SUBTRACT)

    # Esquisse30 → Boss.-Extru.16 (add)
    with BuildSketch(Plane(origin=(0, 14.15, 0), x_dir=(1, 0, 0), z_dir=(0, 1, 0))):
        with Locations((-17.5, 7.5)):
            Rectangle(ESQUISSE30_W, ESQUISSE30_H)
    extrude(amount=BOSS_EXTRU_16_DEPTH)

    # Esquisse31 → Boss.-Extru.17 (add)
    with BuildSketch(Plane(origin=(0, 17.15, 0), x_dir=(1, 0, 0), z_dir=(0, 1, 0))):
        with Locations((-33.75, 13.75)):
            Rectangle(ESQUISSE31_W, ESQUISSE31_H)
        with Locations((-24.25, 13.75)):
            Rectangle(ESQUISSE31_W, ESQUISSE31_H)
        with Locations((-9.25, 4.75)):
            Rectangle(ESQUISSE31_W_2, ESQUISSE31_H_2)
        Polygon((-25.5, 2), (-25.5, -5), (0, -5), (0, 2), (-18.5, 2), align=None)
    extrude(amount=BOSS_EXTRU_17_DEPTH)

    # Esquisse32 → Enlèv. mat.-Extru.8 (cut, through all)
    with BuildSketch(Plane.ZY.offset(25.5)):
        with Locations(Location((-4.75, 20.65, 0), (0, 0, 270))):
            Circle(ESQUISSE32_R)
        with Locations((1.5, 20.65)):
            Circle(ESQUISSE32_R_2)
    extrude(amount=-ENL_V_MAT_EXTRU_8_DEPTH, mode=Mode.SUBTRACT)

    # Chanfrein1
    chanfrein1_edges = [part.edges().sort_by_distance(p)[0] for p in [
        (-9.25, 17.15, -7.5),
    ]]
    chamfer(chanfrein1_edges, length=CHANFREIN1_SIZE - 0.0001)  # a hair under: the kernel refuses the full size

    # Esquisse34 → Boss.-Extru.18 (add)
    with BuildSketch(Plane(origin=(0, 0, -20), x_dir=(-1, 0, 0), z_dir=(0, 0, -1))):
        with BuildLine():
            Line((23, 24.15), (22.5, 24.15))
            ThreePointArc((22.5, 24.15), (22.853553391, 24.003553391), (23, 23.65))
            Line((23, 23.65), (23, 24.15))
        make_face()
        with BuildLine():
            Line((32.5, 24.15), (32.5, 23.65))
            ThreePointArc((32.5, 23.65), (32.353553391, 24.003553391), (32, 24.15))
            Line((32, 24.15), (32.5, 24.15))
        make_face()
    extrude(amount=-BOSS_EXTRU_18_DEPTH)


solid = part.part
